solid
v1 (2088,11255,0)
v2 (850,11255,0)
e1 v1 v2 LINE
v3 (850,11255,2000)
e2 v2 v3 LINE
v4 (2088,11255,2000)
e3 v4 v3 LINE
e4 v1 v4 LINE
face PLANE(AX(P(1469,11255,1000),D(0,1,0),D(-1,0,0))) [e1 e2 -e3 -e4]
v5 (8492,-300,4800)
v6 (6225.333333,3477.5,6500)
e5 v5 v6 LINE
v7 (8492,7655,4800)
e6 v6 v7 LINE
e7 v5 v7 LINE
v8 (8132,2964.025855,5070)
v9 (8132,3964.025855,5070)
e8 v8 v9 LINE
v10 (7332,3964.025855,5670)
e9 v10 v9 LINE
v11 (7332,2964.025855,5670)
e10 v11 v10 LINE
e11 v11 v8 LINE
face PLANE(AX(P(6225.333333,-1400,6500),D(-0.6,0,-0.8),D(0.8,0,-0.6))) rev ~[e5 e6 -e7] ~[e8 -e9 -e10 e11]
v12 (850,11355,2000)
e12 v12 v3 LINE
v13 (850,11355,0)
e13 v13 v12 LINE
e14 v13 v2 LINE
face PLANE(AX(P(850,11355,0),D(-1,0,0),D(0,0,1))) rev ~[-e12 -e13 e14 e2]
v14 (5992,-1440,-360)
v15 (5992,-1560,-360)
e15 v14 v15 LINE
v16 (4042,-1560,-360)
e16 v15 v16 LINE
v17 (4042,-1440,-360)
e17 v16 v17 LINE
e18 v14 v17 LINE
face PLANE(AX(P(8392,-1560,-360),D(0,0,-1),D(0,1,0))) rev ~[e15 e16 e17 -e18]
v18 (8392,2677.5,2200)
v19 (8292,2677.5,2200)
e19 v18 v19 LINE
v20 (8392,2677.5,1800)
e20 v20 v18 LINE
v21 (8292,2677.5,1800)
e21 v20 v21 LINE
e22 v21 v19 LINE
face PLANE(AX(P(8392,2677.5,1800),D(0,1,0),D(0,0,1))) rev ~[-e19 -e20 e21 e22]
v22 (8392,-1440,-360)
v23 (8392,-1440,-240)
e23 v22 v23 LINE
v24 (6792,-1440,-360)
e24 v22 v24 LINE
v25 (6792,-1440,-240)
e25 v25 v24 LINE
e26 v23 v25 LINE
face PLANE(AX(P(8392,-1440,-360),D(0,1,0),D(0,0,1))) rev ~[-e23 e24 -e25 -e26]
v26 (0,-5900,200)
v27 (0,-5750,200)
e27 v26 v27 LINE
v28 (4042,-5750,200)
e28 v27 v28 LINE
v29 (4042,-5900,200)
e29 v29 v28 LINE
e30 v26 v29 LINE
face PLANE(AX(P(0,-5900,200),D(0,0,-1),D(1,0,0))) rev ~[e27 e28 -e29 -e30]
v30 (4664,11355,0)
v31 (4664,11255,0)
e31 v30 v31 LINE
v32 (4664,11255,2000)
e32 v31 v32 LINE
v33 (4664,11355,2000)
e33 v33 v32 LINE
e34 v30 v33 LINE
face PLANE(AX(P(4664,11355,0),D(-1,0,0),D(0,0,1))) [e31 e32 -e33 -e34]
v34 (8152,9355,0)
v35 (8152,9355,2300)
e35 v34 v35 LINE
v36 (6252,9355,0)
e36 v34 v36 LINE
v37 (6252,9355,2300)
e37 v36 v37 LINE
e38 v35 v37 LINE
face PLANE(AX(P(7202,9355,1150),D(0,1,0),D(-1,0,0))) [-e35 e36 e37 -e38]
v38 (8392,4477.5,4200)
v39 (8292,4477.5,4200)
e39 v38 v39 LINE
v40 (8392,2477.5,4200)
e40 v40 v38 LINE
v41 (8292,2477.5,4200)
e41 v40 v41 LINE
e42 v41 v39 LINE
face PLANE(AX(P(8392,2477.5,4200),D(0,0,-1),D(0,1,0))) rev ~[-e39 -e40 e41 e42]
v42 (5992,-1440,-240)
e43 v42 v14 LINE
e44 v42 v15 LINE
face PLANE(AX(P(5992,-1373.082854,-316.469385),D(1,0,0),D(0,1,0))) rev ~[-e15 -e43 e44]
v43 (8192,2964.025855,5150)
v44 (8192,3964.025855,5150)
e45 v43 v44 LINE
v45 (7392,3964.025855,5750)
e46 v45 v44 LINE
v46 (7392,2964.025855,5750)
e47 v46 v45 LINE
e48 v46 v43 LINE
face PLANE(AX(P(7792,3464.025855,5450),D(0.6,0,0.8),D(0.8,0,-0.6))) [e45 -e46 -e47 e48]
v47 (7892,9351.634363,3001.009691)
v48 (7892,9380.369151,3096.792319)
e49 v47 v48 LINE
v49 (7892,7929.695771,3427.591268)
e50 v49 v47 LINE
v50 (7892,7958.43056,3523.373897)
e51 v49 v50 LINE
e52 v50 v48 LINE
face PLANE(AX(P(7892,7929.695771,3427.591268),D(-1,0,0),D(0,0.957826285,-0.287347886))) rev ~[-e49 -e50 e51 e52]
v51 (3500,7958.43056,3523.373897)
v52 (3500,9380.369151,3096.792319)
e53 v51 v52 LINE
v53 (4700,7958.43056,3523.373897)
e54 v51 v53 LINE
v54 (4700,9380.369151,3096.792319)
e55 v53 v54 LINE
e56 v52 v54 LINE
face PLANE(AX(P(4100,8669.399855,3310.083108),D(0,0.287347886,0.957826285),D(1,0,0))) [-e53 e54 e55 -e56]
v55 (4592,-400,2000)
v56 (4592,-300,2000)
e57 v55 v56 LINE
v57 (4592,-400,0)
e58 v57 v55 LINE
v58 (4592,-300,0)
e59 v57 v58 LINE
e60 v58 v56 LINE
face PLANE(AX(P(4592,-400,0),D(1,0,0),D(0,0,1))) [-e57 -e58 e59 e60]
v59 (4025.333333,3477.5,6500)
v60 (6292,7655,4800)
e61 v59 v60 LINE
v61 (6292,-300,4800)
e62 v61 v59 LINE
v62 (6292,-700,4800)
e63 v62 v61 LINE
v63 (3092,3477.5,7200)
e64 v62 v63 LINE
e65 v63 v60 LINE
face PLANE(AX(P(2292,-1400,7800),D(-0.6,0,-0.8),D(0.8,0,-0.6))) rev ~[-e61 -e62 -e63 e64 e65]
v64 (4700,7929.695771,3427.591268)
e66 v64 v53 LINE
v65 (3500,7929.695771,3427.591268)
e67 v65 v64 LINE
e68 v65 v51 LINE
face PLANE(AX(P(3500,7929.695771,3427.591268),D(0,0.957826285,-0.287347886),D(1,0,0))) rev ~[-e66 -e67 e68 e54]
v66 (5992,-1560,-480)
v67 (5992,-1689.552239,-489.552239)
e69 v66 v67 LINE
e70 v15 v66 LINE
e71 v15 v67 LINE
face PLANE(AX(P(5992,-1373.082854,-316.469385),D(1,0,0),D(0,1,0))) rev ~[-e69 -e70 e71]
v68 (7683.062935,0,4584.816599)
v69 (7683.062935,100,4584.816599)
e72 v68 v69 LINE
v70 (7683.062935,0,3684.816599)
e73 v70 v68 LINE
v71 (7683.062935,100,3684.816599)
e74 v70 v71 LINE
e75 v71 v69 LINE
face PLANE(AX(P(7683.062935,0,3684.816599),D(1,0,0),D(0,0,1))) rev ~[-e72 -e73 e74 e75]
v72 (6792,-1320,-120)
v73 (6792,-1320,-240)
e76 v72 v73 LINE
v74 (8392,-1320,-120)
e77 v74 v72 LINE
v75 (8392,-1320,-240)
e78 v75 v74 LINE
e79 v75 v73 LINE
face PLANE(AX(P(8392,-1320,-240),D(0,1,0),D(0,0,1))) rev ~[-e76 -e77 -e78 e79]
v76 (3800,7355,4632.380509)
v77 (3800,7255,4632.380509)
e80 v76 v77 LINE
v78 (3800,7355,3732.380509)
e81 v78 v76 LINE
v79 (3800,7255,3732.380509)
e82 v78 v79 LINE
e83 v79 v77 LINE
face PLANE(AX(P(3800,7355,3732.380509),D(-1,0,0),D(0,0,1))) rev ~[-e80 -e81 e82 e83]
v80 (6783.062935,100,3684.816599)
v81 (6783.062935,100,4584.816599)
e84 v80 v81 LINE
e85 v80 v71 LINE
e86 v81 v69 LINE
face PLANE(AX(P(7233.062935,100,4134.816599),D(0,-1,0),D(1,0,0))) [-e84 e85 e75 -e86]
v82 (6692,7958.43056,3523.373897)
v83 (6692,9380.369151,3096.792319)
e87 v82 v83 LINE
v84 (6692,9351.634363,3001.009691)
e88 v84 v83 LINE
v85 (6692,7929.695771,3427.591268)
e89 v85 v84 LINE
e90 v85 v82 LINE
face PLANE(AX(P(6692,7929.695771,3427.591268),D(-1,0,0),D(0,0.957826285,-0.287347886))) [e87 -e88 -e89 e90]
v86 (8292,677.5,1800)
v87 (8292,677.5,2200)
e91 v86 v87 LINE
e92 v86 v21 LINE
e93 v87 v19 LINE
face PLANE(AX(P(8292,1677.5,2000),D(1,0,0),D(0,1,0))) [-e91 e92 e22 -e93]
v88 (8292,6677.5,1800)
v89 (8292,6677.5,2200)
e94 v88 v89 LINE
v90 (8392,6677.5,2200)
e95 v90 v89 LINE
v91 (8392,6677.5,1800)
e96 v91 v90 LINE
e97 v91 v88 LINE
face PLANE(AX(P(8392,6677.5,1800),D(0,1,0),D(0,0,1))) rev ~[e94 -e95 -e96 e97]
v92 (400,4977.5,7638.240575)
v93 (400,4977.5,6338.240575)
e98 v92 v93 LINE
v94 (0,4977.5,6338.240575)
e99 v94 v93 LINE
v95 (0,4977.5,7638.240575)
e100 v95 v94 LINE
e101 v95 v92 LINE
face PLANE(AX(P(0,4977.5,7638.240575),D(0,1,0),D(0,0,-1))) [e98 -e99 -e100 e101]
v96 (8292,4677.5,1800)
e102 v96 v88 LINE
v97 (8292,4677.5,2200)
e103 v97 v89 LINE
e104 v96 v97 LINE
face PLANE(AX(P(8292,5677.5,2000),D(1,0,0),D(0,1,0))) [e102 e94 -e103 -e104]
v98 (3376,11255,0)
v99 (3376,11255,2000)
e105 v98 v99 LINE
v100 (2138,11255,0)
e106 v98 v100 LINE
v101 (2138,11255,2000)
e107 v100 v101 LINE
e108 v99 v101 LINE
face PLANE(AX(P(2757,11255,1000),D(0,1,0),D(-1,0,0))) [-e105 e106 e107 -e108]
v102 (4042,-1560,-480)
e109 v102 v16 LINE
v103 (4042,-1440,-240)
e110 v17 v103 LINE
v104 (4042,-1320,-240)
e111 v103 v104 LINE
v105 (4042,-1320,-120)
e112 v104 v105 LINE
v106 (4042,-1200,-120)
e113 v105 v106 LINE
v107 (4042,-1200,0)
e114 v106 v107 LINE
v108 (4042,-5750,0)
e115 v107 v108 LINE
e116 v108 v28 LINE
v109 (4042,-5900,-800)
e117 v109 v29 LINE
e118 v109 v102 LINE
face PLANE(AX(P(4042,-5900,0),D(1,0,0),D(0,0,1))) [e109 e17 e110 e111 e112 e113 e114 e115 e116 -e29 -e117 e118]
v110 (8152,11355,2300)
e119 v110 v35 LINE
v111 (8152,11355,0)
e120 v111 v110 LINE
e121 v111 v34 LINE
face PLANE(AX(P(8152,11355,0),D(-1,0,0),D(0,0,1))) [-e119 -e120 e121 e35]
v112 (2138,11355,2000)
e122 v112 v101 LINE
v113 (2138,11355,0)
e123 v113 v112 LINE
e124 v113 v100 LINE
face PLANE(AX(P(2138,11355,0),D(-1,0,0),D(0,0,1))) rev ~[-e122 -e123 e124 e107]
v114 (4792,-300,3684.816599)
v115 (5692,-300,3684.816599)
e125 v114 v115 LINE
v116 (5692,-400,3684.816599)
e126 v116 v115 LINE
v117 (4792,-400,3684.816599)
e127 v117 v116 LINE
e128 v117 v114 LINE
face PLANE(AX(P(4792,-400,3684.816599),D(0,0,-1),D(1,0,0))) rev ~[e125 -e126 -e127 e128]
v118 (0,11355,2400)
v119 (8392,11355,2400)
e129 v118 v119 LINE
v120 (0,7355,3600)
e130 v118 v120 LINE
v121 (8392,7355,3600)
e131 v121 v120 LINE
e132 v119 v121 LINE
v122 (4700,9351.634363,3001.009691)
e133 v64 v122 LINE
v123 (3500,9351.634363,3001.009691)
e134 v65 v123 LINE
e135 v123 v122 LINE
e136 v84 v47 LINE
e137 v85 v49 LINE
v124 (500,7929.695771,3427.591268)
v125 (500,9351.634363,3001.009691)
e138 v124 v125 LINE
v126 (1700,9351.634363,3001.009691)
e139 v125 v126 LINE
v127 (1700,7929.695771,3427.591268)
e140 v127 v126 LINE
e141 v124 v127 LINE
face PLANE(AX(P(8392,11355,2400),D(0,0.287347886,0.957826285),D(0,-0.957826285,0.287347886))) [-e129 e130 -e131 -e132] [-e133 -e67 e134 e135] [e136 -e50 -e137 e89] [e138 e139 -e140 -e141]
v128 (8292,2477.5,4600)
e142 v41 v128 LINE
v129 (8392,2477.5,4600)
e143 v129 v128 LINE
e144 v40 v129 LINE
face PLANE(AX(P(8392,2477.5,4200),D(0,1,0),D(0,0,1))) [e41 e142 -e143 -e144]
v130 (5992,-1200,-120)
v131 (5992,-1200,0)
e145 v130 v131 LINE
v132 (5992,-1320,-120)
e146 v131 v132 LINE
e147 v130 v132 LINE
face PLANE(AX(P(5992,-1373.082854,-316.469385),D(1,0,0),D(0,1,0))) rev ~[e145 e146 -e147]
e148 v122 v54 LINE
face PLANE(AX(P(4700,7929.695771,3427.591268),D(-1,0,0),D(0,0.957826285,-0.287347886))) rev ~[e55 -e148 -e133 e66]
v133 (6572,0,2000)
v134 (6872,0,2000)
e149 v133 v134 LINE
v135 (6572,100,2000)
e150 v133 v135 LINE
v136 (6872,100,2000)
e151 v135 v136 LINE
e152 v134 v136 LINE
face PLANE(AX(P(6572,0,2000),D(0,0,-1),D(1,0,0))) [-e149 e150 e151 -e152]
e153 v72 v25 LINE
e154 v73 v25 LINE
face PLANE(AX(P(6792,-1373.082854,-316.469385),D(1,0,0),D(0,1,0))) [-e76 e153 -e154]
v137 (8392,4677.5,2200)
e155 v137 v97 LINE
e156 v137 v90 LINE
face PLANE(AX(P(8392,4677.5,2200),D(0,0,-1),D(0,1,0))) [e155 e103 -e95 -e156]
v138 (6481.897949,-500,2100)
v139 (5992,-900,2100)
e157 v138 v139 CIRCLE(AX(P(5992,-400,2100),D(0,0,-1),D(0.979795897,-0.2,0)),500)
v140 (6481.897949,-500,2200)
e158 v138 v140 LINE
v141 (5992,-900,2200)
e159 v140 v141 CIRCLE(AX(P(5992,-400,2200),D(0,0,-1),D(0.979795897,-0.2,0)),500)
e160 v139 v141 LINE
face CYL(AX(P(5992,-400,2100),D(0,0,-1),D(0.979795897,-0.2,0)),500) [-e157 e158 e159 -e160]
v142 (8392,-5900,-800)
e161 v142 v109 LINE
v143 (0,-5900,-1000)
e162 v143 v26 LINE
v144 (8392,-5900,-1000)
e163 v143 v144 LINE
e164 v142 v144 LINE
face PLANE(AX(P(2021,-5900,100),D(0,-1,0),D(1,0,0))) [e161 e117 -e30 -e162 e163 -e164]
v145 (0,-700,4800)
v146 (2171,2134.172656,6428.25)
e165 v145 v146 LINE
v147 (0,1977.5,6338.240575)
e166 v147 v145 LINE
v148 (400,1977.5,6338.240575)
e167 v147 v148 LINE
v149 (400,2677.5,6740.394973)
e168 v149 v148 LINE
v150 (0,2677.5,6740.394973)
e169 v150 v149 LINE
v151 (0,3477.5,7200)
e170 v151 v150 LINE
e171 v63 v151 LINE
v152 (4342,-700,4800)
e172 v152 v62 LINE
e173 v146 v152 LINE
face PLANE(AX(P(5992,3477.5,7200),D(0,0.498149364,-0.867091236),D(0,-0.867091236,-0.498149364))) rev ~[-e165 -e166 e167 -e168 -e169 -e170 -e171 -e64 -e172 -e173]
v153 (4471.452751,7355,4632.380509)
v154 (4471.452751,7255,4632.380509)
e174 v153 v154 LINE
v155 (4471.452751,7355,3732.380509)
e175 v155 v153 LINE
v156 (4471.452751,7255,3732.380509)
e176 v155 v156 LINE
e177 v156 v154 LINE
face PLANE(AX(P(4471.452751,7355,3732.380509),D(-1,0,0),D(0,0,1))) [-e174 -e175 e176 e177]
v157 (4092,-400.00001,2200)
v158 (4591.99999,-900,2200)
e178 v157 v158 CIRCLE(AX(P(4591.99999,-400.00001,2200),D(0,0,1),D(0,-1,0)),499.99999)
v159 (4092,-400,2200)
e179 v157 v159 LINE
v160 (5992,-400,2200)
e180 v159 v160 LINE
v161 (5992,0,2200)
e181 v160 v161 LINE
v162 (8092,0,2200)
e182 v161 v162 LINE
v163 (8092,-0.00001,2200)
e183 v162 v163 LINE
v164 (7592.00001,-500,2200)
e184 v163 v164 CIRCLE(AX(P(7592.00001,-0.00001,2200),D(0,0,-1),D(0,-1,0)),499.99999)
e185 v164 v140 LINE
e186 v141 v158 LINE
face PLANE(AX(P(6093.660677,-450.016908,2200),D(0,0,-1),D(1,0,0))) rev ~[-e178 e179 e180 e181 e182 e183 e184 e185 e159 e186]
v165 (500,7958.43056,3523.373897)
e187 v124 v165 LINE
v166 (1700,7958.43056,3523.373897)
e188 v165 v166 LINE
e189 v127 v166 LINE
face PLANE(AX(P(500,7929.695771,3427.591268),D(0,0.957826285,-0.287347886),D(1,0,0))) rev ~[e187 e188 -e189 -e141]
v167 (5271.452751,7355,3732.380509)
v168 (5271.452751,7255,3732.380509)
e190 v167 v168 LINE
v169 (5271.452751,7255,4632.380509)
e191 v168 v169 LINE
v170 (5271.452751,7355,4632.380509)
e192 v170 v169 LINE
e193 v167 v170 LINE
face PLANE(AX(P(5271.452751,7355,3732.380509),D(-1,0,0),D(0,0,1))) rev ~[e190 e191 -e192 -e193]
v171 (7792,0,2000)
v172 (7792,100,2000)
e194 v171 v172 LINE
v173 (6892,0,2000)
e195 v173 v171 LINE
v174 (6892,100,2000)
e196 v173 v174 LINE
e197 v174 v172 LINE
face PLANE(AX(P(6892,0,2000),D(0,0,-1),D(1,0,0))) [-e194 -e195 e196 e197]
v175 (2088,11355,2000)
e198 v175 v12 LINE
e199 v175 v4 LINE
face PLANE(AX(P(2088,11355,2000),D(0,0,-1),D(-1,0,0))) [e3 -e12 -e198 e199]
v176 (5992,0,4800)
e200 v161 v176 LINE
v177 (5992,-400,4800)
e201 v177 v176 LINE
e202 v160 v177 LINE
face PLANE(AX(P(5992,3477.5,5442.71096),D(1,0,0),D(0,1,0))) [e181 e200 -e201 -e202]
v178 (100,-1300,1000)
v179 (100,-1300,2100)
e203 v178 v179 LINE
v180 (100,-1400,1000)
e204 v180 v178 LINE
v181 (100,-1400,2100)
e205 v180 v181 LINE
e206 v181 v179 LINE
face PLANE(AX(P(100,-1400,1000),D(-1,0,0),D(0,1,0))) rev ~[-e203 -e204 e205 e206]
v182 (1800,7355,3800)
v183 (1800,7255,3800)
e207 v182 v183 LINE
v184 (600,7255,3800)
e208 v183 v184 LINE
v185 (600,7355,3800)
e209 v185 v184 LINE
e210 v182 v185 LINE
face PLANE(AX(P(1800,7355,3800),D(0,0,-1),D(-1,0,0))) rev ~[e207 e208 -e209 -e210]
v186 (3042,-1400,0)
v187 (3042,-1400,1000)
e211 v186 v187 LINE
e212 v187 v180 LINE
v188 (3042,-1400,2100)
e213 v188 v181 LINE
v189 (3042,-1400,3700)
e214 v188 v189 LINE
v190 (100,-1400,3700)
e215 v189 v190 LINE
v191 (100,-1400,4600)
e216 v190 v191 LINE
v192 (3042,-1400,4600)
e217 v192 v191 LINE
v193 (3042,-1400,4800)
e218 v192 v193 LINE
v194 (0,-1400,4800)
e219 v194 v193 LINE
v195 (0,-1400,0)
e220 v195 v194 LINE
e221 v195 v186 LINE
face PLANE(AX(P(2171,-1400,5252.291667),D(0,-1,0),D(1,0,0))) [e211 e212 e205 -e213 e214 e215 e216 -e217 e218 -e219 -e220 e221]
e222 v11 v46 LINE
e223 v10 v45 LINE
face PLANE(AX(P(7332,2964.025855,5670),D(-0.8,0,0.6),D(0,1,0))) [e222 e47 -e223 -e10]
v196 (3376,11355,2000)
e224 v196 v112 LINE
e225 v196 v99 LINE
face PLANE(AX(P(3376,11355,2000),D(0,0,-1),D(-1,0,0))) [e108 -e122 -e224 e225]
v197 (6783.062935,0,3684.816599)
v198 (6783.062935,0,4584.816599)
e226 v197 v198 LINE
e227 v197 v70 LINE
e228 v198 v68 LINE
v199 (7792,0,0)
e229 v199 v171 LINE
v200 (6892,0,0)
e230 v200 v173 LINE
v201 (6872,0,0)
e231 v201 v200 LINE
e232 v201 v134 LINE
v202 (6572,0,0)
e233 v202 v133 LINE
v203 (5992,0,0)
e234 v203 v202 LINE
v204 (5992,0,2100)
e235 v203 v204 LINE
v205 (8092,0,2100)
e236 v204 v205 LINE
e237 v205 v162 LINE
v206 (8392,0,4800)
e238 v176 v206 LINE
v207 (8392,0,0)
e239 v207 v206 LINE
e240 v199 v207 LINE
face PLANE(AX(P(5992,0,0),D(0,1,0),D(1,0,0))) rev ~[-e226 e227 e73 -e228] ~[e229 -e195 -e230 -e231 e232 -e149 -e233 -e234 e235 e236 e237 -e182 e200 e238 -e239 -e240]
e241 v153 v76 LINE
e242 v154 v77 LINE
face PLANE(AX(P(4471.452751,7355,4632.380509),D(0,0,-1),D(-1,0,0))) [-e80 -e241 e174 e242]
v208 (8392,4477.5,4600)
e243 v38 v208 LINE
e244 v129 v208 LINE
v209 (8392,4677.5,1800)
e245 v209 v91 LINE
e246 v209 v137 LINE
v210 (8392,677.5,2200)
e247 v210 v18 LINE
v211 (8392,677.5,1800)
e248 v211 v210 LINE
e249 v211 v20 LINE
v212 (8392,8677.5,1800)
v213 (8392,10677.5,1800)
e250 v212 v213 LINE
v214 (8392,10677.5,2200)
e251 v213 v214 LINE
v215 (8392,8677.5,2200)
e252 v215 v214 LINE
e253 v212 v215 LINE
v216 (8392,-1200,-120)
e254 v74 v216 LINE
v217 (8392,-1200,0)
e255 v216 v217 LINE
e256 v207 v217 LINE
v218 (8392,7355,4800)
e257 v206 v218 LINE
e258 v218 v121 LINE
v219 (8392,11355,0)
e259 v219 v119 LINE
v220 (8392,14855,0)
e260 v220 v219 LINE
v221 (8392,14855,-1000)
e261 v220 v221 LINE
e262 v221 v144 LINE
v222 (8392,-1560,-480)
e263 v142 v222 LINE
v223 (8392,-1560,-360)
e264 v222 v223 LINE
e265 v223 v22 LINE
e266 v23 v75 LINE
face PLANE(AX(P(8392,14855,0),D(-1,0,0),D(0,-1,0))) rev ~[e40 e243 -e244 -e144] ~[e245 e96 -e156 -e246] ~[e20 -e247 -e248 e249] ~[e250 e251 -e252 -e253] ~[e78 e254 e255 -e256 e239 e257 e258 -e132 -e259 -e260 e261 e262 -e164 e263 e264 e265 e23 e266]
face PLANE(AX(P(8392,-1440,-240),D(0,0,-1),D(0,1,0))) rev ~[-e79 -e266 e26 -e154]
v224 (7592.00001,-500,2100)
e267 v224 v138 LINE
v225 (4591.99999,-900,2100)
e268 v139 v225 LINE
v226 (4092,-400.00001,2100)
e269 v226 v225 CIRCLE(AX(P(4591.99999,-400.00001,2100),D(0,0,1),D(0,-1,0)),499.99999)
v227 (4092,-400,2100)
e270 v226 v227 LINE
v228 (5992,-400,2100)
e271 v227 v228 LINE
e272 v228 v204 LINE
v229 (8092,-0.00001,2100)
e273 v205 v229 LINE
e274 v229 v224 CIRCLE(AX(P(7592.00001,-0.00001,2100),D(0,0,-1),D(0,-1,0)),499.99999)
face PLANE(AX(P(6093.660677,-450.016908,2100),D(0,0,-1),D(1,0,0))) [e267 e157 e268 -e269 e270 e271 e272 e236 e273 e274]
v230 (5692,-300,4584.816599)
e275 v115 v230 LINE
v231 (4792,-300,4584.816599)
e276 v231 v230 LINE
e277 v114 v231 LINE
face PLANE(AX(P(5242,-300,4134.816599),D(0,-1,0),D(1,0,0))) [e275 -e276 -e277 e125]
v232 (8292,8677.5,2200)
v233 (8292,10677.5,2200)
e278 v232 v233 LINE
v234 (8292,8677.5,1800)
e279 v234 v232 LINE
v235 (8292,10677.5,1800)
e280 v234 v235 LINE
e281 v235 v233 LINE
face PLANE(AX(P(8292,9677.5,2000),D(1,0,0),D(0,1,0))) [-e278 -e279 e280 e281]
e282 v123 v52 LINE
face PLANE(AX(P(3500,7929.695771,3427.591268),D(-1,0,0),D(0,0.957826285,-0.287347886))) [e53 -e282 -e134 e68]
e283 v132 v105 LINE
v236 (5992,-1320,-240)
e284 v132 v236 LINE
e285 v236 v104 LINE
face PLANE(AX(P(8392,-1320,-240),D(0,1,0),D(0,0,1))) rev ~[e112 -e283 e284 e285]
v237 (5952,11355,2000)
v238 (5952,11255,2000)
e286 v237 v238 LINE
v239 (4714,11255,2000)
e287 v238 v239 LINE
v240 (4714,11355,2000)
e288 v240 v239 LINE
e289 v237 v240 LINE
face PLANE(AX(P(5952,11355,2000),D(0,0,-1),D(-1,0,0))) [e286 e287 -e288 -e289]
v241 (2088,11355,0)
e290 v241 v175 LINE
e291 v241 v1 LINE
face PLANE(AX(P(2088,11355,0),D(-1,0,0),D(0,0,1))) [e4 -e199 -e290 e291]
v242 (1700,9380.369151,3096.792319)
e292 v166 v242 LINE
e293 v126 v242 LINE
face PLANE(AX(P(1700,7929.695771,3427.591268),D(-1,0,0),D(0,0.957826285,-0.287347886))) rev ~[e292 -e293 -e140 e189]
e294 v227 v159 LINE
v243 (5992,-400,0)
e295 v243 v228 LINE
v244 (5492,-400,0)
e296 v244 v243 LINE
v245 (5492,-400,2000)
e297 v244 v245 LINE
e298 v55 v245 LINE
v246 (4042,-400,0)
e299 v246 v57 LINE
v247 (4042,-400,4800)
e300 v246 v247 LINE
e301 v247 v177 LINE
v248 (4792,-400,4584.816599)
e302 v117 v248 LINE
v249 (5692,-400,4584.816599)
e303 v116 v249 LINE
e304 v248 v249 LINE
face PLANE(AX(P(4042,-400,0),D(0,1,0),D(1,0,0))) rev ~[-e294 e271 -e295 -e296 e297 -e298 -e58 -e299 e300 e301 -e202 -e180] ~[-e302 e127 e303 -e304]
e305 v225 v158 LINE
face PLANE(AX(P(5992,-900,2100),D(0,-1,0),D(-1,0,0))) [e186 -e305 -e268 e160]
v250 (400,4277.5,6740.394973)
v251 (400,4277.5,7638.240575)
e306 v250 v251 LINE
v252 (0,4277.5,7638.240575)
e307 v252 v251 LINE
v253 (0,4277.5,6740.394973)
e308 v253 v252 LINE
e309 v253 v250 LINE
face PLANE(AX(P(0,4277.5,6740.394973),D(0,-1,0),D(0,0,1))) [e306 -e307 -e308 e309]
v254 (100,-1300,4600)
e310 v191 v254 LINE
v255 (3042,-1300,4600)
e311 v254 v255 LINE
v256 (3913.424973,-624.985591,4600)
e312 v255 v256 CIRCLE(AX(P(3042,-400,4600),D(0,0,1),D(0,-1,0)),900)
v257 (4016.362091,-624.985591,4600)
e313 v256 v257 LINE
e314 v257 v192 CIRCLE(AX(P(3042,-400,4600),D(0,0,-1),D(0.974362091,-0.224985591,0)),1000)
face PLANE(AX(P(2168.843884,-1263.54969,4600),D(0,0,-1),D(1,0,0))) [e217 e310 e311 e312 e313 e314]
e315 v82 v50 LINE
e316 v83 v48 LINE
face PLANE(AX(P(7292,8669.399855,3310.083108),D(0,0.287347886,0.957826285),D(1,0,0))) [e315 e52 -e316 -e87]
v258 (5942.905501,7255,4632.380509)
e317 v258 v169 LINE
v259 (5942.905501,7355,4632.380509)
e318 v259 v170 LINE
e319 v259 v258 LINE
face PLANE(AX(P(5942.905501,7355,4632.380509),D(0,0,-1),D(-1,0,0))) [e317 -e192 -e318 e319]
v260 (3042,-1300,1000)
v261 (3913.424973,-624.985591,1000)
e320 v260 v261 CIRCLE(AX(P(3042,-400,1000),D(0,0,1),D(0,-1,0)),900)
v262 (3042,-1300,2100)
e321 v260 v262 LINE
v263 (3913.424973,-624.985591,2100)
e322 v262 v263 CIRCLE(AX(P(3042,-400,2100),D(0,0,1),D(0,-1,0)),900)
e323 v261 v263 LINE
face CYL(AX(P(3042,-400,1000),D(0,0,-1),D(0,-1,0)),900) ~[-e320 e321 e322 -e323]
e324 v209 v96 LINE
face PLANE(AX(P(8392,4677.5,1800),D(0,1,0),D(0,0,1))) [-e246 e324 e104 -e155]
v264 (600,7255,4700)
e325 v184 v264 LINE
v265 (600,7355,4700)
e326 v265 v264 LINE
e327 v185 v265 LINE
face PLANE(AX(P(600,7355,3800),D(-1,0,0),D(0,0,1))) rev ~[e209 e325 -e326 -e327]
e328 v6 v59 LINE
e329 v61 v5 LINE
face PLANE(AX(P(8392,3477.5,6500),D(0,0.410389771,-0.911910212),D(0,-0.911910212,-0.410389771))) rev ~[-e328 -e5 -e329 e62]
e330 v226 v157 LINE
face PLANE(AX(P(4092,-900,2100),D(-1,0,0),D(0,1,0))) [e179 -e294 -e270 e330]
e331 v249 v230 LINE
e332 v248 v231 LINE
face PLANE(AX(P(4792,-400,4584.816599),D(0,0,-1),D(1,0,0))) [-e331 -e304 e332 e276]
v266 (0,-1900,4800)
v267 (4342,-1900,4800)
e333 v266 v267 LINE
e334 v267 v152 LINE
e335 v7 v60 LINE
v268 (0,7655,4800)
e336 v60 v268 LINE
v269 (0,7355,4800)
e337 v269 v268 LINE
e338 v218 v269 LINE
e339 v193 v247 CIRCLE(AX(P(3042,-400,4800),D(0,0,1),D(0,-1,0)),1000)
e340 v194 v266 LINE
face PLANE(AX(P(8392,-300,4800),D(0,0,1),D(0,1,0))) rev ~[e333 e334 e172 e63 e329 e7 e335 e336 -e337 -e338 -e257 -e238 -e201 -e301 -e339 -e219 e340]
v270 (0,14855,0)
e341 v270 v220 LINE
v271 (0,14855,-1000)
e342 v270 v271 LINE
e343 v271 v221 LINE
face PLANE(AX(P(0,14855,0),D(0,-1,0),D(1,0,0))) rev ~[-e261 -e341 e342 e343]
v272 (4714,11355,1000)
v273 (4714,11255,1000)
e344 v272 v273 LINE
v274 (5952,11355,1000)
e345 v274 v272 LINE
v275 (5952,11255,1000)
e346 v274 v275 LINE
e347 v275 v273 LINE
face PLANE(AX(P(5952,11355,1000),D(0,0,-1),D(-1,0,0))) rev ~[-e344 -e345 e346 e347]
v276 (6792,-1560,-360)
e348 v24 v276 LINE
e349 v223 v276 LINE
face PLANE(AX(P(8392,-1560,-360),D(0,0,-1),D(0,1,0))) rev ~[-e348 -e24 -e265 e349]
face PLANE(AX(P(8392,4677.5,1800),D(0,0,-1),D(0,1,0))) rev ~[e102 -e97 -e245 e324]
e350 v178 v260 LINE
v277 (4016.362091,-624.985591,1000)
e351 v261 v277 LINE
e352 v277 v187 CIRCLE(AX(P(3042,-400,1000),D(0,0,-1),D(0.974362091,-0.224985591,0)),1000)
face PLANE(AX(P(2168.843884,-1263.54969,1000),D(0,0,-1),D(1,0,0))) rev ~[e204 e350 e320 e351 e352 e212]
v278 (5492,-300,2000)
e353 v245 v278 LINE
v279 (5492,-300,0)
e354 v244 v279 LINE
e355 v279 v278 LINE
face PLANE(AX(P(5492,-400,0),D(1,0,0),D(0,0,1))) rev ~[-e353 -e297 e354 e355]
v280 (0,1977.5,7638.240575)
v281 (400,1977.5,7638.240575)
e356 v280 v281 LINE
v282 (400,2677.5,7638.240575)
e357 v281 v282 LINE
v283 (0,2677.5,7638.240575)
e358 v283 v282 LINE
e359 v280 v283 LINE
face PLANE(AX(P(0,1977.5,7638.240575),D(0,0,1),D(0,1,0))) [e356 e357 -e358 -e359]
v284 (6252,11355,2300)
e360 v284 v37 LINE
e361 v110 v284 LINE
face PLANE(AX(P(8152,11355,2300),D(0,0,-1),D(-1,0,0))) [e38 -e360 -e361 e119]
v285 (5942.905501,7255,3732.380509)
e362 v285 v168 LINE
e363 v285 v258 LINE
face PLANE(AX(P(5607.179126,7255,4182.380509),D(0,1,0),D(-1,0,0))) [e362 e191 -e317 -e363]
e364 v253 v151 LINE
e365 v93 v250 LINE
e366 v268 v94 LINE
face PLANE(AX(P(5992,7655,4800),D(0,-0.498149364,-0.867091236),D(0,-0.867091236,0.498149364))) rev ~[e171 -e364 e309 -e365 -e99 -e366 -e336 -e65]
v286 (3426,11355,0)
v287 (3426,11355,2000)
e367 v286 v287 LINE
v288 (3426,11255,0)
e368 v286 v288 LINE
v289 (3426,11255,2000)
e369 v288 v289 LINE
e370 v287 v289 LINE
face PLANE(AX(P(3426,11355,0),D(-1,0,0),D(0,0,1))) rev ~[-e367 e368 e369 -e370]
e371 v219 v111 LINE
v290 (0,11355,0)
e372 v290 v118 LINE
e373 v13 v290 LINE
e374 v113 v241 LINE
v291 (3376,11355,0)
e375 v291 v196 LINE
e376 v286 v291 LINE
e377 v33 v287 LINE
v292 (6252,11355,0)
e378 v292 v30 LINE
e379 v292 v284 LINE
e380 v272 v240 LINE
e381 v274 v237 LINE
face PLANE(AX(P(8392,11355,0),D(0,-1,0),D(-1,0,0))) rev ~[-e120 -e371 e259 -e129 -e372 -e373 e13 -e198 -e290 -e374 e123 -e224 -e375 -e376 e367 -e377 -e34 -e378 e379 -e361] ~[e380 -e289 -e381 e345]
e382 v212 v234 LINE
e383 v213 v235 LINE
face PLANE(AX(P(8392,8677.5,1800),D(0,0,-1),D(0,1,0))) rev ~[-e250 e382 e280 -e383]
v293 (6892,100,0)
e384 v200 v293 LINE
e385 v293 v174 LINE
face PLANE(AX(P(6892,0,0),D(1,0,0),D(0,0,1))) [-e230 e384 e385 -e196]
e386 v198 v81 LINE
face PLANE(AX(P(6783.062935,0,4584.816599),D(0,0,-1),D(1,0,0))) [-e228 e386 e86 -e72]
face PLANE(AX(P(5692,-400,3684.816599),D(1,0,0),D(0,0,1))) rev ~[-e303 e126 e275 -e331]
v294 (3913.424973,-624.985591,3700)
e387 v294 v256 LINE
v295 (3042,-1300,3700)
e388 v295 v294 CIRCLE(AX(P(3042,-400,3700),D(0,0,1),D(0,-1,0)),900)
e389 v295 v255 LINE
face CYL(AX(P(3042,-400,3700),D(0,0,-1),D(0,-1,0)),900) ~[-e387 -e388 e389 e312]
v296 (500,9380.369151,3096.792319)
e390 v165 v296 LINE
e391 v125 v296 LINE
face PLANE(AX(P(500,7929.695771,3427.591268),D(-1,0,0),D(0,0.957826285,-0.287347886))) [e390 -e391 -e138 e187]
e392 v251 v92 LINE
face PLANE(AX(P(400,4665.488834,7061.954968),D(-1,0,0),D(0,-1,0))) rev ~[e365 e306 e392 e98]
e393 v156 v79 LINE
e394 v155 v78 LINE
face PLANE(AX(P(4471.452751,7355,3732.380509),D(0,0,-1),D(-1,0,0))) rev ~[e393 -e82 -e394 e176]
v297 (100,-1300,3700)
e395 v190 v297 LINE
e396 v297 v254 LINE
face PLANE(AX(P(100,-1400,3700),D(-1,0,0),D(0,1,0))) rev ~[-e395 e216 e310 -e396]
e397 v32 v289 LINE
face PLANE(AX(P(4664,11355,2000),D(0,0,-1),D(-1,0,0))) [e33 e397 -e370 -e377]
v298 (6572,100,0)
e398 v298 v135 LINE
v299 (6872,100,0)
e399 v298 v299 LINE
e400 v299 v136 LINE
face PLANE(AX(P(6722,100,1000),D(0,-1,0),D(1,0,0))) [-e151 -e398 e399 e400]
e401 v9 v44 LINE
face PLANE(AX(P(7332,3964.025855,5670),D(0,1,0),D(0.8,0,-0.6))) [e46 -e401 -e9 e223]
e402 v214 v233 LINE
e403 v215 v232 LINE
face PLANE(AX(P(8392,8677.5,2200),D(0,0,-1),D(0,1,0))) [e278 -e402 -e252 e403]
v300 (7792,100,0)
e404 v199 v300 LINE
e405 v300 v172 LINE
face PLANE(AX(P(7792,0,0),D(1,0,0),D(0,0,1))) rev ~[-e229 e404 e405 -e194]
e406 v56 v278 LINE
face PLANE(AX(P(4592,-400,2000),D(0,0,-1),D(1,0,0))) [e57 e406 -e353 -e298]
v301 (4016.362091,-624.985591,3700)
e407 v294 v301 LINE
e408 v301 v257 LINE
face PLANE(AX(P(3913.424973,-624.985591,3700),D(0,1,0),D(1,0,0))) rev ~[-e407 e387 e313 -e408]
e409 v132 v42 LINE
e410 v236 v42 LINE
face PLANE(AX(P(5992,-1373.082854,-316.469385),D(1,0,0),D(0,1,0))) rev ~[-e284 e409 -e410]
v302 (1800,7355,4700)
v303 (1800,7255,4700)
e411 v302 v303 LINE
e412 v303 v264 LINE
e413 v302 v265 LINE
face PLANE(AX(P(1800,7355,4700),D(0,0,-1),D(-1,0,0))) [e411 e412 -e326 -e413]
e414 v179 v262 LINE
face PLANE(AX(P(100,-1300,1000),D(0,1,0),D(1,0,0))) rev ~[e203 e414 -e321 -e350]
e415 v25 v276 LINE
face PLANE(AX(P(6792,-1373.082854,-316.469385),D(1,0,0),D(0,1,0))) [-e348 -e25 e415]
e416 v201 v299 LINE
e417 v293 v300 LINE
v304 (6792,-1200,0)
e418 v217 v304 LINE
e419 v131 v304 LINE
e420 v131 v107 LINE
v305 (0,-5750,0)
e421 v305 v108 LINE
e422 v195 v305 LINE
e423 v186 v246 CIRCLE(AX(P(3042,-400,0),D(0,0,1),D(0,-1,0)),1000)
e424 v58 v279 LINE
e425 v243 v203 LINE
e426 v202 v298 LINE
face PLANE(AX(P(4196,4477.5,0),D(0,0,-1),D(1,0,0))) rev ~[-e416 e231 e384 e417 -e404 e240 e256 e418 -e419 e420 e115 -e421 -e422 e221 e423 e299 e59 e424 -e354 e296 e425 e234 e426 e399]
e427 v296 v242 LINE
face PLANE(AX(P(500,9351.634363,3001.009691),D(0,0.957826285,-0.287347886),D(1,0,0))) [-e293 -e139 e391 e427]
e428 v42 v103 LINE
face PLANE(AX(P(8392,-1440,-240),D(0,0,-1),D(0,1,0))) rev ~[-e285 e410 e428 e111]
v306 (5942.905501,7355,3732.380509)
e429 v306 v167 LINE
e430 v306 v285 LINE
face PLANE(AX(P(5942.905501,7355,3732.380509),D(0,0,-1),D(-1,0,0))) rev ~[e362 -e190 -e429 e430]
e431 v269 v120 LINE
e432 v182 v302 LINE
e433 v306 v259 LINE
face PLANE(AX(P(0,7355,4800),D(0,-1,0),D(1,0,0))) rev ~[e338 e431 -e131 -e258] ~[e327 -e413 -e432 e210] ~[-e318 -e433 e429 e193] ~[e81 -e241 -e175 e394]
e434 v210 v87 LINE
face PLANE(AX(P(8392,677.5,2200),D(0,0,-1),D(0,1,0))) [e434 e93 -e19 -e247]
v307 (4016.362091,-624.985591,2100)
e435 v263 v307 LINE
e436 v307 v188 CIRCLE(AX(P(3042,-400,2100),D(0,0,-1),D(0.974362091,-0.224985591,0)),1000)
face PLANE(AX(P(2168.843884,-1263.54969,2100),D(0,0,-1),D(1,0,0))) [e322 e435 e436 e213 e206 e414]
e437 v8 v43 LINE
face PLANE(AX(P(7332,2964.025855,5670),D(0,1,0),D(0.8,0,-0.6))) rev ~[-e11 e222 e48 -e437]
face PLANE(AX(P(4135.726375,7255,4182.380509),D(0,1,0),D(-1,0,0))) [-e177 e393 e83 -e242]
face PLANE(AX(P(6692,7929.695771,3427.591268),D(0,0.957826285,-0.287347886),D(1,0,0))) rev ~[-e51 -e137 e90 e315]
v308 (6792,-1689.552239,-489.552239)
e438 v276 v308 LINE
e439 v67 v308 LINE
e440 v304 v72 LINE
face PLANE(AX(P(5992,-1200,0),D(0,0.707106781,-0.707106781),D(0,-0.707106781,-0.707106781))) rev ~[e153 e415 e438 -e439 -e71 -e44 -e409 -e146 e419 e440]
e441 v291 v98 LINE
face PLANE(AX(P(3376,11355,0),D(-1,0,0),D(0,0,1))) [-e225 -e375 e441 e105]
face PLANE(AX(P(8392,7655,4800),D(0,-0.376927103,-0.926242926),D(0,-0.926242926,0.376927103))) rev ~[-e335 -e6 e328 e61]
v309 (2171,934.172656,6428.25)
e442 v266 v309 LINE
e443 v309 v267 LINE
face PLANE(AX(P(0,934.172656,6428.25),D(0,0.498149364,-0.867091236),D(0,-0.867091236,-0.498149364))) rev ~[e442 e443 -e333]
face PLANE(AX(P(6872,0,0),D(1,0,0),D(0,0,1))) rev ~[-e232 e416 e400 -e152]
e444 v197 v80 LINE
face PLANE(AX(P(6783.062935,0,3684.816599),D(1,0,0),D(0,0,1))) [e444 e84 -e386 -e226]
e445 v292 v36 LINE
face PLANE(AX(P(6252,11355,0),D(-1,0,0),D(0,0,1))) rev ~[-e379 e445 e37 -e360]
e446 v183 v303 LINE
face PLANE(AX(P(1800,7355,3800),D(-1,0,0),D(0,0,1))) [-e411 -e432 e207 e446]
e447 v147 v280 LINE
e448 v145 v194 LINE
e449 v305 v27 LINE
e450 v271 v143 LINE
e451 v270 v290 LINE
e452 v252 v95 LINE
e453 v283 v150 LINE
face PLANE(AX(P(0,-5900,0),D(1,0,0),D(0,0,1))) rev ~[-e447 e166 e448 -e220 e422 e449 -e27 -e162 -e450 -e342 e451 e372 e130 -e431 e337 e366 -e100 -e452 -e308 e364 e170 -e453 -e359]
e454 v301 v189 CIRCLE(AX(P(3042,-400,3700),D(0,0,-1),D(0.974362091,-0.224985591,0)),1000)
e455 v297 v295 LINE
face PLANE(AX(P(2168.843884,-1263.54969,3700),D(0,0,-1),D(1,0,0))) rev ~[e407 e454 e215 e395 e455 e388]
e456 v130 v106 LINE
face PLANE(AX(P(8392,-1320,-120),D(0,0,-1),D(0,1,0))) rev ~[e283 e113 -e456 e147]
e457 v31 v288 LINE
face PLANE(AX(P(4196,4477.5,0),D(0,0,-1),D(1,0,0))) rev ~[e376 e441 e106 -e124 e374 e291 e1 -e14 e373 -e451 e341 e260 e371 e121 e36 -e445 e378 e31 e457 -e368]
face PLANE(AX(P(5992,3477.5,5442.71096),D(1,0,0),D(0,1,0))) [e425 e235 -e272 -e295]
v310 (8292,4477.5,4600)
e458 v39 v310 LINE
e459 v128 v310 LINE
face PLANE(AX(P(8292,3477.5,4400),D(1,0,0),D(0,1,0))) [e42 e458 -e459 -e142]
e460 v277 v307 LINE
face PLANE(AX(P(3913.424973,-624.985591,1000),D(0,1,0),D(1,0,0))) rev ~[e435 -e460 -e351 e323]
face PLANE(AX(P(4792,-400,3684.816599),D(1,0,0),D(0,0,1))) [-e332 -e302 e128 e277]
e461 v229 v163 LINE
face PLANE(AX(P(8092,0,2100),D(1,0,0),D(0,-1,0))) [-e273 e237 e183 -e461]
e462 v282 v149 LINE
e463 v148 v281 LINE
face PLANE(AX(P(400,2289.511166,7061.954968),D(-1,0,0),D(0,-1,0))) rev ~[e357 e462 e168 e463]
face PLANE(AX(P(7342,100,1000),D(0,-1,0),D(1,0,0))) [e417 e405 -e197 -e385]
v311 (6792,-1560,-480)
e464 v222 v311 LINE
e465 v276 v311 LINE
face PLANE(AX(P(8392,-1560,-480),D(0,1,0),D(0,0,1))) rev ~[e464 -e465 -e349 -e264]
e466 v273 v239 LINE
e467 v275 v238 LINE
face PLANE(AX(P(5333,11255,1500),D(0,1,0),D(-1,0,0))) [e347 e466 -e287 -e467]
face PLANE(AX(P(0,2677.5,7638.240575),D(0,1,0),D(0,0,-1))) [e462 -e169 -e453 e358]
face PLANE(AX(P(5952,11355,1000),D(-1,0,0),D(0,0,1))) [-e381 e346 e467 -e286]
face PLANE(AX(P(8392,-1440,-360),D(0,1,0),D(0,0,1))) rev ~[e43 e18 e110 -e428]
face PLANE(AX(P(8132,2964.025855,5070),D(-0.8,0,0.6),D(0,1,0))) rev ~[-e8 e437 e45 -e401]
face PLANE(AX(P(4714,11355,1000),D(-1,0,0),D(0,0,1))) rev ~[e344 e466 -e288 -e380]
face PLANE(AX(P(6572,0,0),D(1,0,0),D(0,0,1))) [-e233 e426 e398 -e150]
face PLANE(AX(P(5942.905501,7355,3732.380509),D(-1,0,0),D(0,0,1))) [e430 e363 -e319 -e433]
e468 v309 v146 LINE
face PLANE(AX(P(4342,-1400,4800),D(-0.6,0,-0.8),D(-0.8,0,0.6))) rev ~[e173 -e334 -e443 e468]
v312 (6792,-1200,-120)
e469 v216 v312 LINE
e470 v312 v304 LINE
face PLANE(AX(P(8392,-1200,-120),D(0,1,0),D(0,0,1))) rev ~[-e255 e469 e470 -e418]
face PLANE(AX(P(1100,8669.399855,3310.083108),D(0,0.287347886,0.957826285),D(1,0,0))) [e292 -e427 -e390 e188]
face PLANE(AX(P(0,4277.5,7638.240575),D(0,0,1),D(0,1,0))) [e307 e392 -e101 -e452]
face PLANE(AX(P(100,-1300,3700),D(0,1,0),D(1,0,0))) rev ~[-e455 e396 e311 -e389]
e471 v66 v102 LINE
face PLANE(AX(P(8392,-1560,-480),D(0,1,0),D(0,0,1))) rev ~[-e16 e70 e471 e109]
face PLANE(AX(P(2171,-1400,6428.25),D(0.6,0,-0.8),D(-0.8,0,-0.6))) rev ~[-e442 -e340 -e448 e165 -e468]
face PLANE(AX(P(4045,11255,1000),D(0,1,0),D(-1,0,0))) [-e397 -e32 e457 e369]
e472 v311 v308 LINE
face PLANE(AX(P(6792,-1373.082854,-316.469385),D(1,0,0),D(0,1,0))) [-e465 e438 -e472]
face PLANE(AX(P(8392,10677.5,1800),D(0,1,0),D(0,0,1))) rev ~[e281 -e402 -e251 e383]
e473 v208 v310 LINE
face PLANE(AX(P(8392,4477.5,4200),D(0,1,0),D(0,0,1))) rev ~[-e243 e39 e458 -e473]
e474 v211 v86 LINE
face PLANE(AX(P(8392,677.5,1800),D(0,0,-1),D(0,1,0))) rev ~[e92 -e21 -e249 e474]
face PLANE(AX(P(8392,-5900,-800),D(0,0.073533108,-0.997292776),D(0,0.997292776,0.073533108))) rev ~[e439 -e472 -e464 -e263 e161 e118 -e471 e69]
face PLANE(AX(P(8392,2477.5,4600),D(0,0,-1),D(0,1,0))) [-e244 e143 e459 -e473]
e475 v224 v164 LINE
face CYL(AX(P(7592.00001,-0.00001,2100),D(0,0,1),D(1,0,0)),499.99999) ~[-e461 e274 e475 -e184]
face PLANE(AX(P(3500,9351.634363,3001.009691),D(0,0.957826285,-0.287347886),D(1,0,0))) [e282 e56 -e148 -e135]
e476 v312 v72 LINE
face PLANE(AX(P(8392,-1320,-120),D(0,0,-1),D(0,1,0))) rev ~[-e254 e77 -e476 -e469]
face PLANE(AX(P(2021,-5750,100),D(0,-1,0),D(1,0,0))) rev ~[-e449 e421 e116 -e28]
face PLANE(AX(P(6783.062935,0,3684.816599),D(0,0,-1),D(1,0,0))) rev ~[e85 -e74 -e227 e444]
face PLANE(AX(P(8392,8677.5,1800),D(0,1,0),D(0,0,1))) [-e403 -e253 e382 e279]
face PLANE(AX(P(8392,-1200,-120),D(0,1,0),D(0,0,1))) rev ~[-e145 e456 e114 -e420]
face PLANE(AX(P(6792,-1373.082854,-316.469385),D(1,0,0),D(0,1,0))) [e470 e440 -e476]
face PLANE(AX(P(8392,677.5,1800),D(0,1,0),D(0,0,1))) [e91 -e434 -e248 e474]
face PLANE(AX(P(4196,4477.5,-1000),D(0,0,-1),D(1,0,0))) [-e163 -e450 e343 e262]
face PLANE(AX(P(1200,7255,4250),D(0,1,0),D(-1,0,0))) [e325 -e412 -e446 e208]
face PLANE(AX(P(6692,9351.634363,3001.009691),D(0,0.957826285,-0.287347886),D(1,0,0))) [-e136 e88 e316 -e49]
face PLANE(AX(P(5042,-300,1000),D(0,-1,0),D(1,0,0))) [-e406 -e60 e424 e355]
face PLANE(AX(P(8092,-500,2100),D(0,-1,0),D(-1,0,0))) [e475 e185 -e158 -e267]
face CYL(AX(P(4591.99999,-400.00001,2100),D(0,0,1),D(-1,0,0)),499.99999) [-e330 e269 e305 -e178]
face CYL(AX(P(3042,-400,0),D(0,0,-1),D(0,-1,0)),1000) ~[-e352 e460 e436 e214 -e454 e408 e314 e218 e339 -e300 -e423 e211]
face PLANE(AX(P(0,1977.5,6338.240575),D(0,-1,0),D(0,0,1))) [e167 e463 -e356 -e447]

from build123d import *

# Parameters (mm, degrees)
F1_DEPTH  = 4800
F2_W      = 8392
F2_H      = 4000
F3_DEPTH  = 2400
F5_DEPTH  = 8392
F7_DEPTH  = 5992
F8_DEPTH  = 300
F11_DEPTH = 12755.001
F14_DEPTH = 500
F16_DEPTH = 8392.001
F18_DEPTH = 100
F20_DEPTH = 12755.001
F21_W     = 2000
F21_H     = 400
F22_DEPTH = 100
F23_W     = 900
F23_H     = 900
F23_H_2   = 2000
F23_W_2   = 300
F24_DEPTH = 100
F25_W     = 900
F25_H     = 2000
F25_H_2   = 900
F26_DEPTH = 100
F29_DEPTH = 1100
F32_DEPTH = 900
F34_DEPTH = 100
F36_DEPTH = 400
F37_R     = 499.99999
F38_W     = 1900
F38_H     = 2300
F39_DEPTH = 2000
F40_W     = 1238
F40_H     = 2000
F40_H_2   = 1000
F41_DEPTH = 100
F42_W     = 1200
F42_H     = 1484.5474734546
F43_DEPTH = 100
F44_W     = 1000
F44_H     = 1000
F45_DEPTH = 100
F46_W     = 671.4527505016
F46_H     = 900
F46_W_2   = 1200
F47_DEPTH = 100
F48_W     = 8392
F48_H     = 20755
F49_DEPTH = 1000
F51_DEPTH = 4350
F52_W     = 4042
F52_H     = 200
F53_DEPTH = 150
F55_DEPTH = 800


# Not quite as in the source:
# - a fillet or chamfer is up to 0.001 mm smaller than in the source, because OpenCascade refuses the exact size


with BuildPart() as f1:
    # F0 (on Top) → F1 (new body)
    with BuildSketch(Plane.XY):
        with BuildLine():
            Line((0, 11355), (0, -1400))
            Line((0, -1400), (3042, -1400))
            ThreePointArc((3042, -1400), (3749.1067811865, -1107.1067811865), (4042, -400))
            Line((4042, -400), (5992, -400))
            Line((5992, -400), (5992, 0))
            Line((5992, 0), (8392, 0))
            Line((8392, 0), (8392, 11355))
            Line((8392, 11355), (0, 11355))
        make_face()
    extrude(amount=F1_DEPTH)

    # F2 (on face) → F3 (cut)
    with BuildSketch(Plane.XY.offset(4800)):
        with Locations((4196, 9355)):
            Rectangle(F2_W, F2_H)
    extrude(amount=-F3_DEPTH, mode=Mode.SUBTRACT)

    # F4 (on face) → F5 (join, through all)
    with BuildSketch(Plane.YZ.offset(8392)):
        Polygon((7355, 2400), (11355, 2400), (7355, 3600), align=None)
    extrude(amount=-F5_DEPTH)

    # F6 (on face) → F7 (join, through all)
    with BuildSketch(Plane.YZ.offset(5992)):
        Polygon((3477.5, 7200), (-700, 4800), (-400, 4800), (0, 4800), (7655, 4800), align=None)
    extrude(amount=-F7_DEPTH)

    # F6 (on face) → F8 (join)
    with BuildSketch(Plane.YZ.offset(5992)):
        Polygon((3477.5, 7200), (-700, 4800), (7655, 4800), align=None)
    extrude(amount=F8_DEPTH)

    # F10 (on face) → F11 (cut, through all)
    with BuildSketch(Plane.XZ.offset(1400)):
        Polygon((2292, 7800), (6292, 4800), (6292, 7800), align=None)
    extrude(amount=-F11_DEPTH, mode=Mode.SUBTRACT)

    # F12 (on face) → F13 (join, up to the next surface of F1)
    with BuildSketch(Plane.XZ.offset(1400)):
        Polygon((2171, 6428.25), (0, 4800), (3042, 4800), (4342, 4800), align=None)
    extrude(until=Until.NEXT, dir=(0, 1, 0))

    # F12 (on face) → F14 (join)
    with BuildSketch(Plane.XZ.offset(1400)):
        Polygon((2171, 6428.25), (0, 4800), (4342, 4800), align=None)
    extrude(amount=F14_DEPTH)

    # F15 (on face) → F16 (cut, through all)
    with BuildSketch(Plane(origin=(0, 0, 0), x_dir=(0, -1, 0), z_dir=(-1, 0, 0))):
        Polygon((-934.17265625, 6428.25), (1900, 4800), (1900, 6428.25), align=None)
    extrude(amount=-F16_DEPTH, mode=Mode.SUBTRACT)

    # F9 (on face) → F17 (join, up to the next surface of F1)
    with BuildSketch(Plane.YZ.offset(8392)):
        Polygon((3477.5, 6500), (-300, 4800), (0, 4800), (7355, 4800), (7655, 4800), align=None)
    extrude(until=Until.NEXT, dir=(-1, 0, 0))

    # F9 (on face) → F18 (join)
    with BuildSketch(Plane.YZ.offset(8392)):
        Polygon((3477.5, 6500), (-300, 4800), (7655, 4800), align=None)
    extrude(amount=F18_DEPTH)

    # F19 (on face) → F20 (cut, through all)
    with BuildSketch(Plane.XZ.offset(1400)):
        Polygon((6225.3333333333, 6500), (8492, 4800), (8492, 6500), align=None)
    extrude(amount=-F20_DEPTH, mode=Mode.SUBTRACT)

    # F21 (on face) → F22 (cut)
    with BuildSketch(Plane.YZ.offset(8392)):
        with Locations((5677.5, 2000)):
            Rectangle(F21_W, F21_H)
        with Locations((1677.5, 2000)):
            Rectangle(F21_W, F21_H)
        with Locations((3477.5, 4400)):
            Rectangle(F21_W, F21_H)
        with Locations((9677.5, 2000)):
            Rectangle(F21_W, F21_H)
    extrude(amount=-F22_DEPTH, mode=Mode.SUBTRACT)

    # F23 (on face) → F24 (cut)
    with BuildSketch(Plane.XZ):
        with Locations((7233.0629348755, 4134.8165988922)):
            Rectangle(F23_W, F23_H)
        with Locations((7342, 1000)):
            Rectangle(F23_W, F23_H_2)
        with Locations((6722, 1000)):
            Rectangle(F23_W_2, F23_H_2)
    extrude(amount=-F24_DEPTH, mode=Mode.SUBTRACT)

    # F25 (on face) → F26 (cut)
    with BuildSketch(Plane.XZ.offset(400)):
        with Locations((5042, 1000)):
            Rectangle(F25_W, F25_H)
        with Locations((5242, 4134.8165988922)):
            Rectangle(F25_W, F25_H_2)
    extrude(amount=-F26_DEPTH, mode=Mode.SUBTRACT)

    # F28 (on offset) → F29 (cut)
    with BuildSketch(Plane(origin=(0, 0, 1000), x_dir=(1, 0, 0), z_dir=(0, 0, -1))):
        with BuildLine():
            Line((3042, 1400), (100, 1400))
            Line((100, 1400), (100, 1300))
            Line((100, 1300), (3042, 1300))
            ThreePointArc((3042, 1300), (3593.1410747417, 1111.5079168446), (3913.4249732822, 624.9855905167))
            Line((3913.4249732822, 624.9855905167), (4016.3620908368, 624.9855905167))
            ThreePointArc((4016.3620908368, 624.9855905167), (3664.5007668603, 1182.6191891708), (3042, 1400))
        make_face()
    extrude(amount=-F29_DEPTH, mode=Mode.SUBTRACT)

    # F31 (on offset) → F32 (cut)
    with BuildSketch(Plane(origin=(0, 0, 3700), x_dir=(1, 0, 0), z_dir=(0, 0, -1))):
        with BuildLine():
            Line((100, 1400), (100, 1300))
            Line((100, 1300), (3042, 1300))
            ThreePointArc((3042, 1300), (3593.1410747417, 1111.5079168446), (3913.4249732822, 624.9855905167))
            Line((3913.4249732822, 624.9855905167), (4016.3620908368, 624.9855905167))
            ThreePointArc((4016.3620908368, 624.9855905167), (3664.5007668603, 1182.6191891708), (3042, 1400))
            Line((3042, 1400), (100, 1400))
        make_face()
    extrude(amount=-F32_DEPTH, mode=Mode.SUBTRACT)

    # F33 (on face) → F34 (join)
    with BuildSketch(Plane(origin=(0, 0, 2100), x_dir=(1, 0, 0), z_dir=(0, 0, -1))):
        with BuildLine():
            Line((8092, 0), (8092, 500))
            Line((8092, 500), (6481.8979485566, 500))
            ThreePointArc((6481.8979485566, 500), (6308.2277660168, 787.2983346207), (5992, 900))
            Line((5992, 900), (4092, 900))
            Line((4092, 900), (4092, 400))
            Line((4092, 400), (5992, 400))
            Line((5992, 400), (5992, 0))
            Line((5992, 0), (8092, 0))
        make_face()
    extrude(amount=-F34_DEPTH)

    # F35 (on face) → F36 (join)
    with BuildSketch(Plane(origin=(0, 0, 0), x_dir=(0, -1, 0), z_dir=(-1, 0, 0))):
        Polygon((-2677.5, 6740.39497307), (-1977.5, 6338.2405745063), (-1977.5, 7638.2405745063), (-2677.5, 7638.2405745063), align=None)
        Polygon((-4977.5, 6338.2405745063), (-4277.5, 6740.39497307), (-4277.5, 7638.2405745063), (-4977.5, 7638.2405745063), align=None)
    extrude(amount=-F36_DEPTH)

    # F37 (radius 500 in the source; OpenCascade refuses exactly that, so slightly less here)
    f37_edges = [f1.edges().sort_by_distance(p)[0] for p in [
        (8092, -500, 2150),
        (4092, -900, 2150),
    ]]
    fillet(f37_edges, radius=F37_R)

    # F38 (on face) → F39 (cut)
    with BuildSketch(Plane(origin=(0, 11355, 0), x_dir=(-1, 0, 0), z_dir=(0, 1, 0))):
        with Locations((-7202, 1150)):
            Rectangle(F38_W, F38_H)
    extrude(amount=-F39_DEPTH, mode=Mode.SUBTRACT)

    # F40 (on face) → F41 (cut)
    with BuildSketch(Plane(origin=(0, 11355, 0), x_dir=(-1, 0, 0), z_dir=(0, 1, 0))):
        with Locations((-1469, 1000)):
            Rectangle(F40_W, F40_H)
        with Locations((-2757, 1000)):
            Rectangle(F40_W, F40_H)
        with Locations((-4045, 1000)):
            Rectangle(F40_W, F40_H)
        with Locations((-5333, 1500)):
            Rectangle(F40_W, F40_H_2)
    extrude(amount=-F41_DEPTH, mode=Mode.SUBTRACT)

    # F42 (on face) → F43 (join)
    with BuildSketch(Plane(origin=(0, 1598.119266055, 5327.0642201835), x_dir=(1, 0, 0), z_dir=(0, 0.2873478856, 0.9578262852))):
        with Locations((7292, 7352.63367649)):
            Rectangle(F42_W, F42_H)
        with Locations((1100, 7352.63367649)):
            Rectangle(F42_W, F42_H)
        with Locations((4100, 7352.63367649)):
            Rectangle(F42_W, F42_H)
    extrude(amount=F43_DEPTH)

    # F44 (on face) → F45 (join)
    with BuildSketch(Plane(origin=(5361.12, 0, 7148.16), x_dir=(0.8, 0, -0.6), z_dir=(0.6, 0, 0.8))):
        with Locations((2963.6, 3464.0258550644)):
            Rectangle(F44_W, F44_H)
    extrude(amount=F45_DEPTH)

    # F46 (on face) → F47 (cut)
    with BuildSketch(Plane(origin=(0, 7355, 0), x_dir=(-1, 0, 0), z_dir=(0, 1, 0))):
        with Locations((-5607.1791257524, 4182.3805087188)):
            Rectangle(F46_W, F46_H)
        with Locations((-4135.7263752508, 4182.3805087188)):
            Rectangle(F46_W, F46_H)
        with Locations((-1200, 4250)):
            Rectangle(F46_W_2, F46_H)
    extrude(amount=-F47_DEPTH, mode=Mode.SUBTRACT)

    # F48 (on face) → F49 (join)
    with BuildSketch(Plane(origin=(0, 0, 0), x_dir=(1, 0, 0), z_dir=(0, 0, -1))):
        with Locations((4196, -4477.5)):
            Rectangle(F48_W, F48_H)
    extrude(amount=F49_DEPTH)

    # F50 (on face) → F51 (cut, through all)
    with BuildSketch(Plane.YZ.offset(8392)):
        Polygon((-1200, -120), (-1200, 0), (-5900, 0), (-5900, -800), (-1560, -480), (-1560, -360), (-1440, -360), (-1440, -240), (-1320, -240), (-1320, -120), align=None)
    extrude(amount=-F51_DEPTH, mode=Mode.SUBTRACT)

    # F52 (on face) → F53 (join)
    with BuildSketch(Plane.XZ.offset(5900)):
        with Locations((2021, 100)):
            Rectangle(F52_W, F52_H)
    extrude(amount=-F53_DEPTH)

    # F54 (on face) → F55 (join)
    with BuildSketch(Plane.YZ.offset(5992)):
        Polygon((-1200, -489.552238806), (-1200, 0), (-1689.552238806, -489.552238806), align=None)
    extrude(amount=F55_DEPTH)


solid = f1.part
